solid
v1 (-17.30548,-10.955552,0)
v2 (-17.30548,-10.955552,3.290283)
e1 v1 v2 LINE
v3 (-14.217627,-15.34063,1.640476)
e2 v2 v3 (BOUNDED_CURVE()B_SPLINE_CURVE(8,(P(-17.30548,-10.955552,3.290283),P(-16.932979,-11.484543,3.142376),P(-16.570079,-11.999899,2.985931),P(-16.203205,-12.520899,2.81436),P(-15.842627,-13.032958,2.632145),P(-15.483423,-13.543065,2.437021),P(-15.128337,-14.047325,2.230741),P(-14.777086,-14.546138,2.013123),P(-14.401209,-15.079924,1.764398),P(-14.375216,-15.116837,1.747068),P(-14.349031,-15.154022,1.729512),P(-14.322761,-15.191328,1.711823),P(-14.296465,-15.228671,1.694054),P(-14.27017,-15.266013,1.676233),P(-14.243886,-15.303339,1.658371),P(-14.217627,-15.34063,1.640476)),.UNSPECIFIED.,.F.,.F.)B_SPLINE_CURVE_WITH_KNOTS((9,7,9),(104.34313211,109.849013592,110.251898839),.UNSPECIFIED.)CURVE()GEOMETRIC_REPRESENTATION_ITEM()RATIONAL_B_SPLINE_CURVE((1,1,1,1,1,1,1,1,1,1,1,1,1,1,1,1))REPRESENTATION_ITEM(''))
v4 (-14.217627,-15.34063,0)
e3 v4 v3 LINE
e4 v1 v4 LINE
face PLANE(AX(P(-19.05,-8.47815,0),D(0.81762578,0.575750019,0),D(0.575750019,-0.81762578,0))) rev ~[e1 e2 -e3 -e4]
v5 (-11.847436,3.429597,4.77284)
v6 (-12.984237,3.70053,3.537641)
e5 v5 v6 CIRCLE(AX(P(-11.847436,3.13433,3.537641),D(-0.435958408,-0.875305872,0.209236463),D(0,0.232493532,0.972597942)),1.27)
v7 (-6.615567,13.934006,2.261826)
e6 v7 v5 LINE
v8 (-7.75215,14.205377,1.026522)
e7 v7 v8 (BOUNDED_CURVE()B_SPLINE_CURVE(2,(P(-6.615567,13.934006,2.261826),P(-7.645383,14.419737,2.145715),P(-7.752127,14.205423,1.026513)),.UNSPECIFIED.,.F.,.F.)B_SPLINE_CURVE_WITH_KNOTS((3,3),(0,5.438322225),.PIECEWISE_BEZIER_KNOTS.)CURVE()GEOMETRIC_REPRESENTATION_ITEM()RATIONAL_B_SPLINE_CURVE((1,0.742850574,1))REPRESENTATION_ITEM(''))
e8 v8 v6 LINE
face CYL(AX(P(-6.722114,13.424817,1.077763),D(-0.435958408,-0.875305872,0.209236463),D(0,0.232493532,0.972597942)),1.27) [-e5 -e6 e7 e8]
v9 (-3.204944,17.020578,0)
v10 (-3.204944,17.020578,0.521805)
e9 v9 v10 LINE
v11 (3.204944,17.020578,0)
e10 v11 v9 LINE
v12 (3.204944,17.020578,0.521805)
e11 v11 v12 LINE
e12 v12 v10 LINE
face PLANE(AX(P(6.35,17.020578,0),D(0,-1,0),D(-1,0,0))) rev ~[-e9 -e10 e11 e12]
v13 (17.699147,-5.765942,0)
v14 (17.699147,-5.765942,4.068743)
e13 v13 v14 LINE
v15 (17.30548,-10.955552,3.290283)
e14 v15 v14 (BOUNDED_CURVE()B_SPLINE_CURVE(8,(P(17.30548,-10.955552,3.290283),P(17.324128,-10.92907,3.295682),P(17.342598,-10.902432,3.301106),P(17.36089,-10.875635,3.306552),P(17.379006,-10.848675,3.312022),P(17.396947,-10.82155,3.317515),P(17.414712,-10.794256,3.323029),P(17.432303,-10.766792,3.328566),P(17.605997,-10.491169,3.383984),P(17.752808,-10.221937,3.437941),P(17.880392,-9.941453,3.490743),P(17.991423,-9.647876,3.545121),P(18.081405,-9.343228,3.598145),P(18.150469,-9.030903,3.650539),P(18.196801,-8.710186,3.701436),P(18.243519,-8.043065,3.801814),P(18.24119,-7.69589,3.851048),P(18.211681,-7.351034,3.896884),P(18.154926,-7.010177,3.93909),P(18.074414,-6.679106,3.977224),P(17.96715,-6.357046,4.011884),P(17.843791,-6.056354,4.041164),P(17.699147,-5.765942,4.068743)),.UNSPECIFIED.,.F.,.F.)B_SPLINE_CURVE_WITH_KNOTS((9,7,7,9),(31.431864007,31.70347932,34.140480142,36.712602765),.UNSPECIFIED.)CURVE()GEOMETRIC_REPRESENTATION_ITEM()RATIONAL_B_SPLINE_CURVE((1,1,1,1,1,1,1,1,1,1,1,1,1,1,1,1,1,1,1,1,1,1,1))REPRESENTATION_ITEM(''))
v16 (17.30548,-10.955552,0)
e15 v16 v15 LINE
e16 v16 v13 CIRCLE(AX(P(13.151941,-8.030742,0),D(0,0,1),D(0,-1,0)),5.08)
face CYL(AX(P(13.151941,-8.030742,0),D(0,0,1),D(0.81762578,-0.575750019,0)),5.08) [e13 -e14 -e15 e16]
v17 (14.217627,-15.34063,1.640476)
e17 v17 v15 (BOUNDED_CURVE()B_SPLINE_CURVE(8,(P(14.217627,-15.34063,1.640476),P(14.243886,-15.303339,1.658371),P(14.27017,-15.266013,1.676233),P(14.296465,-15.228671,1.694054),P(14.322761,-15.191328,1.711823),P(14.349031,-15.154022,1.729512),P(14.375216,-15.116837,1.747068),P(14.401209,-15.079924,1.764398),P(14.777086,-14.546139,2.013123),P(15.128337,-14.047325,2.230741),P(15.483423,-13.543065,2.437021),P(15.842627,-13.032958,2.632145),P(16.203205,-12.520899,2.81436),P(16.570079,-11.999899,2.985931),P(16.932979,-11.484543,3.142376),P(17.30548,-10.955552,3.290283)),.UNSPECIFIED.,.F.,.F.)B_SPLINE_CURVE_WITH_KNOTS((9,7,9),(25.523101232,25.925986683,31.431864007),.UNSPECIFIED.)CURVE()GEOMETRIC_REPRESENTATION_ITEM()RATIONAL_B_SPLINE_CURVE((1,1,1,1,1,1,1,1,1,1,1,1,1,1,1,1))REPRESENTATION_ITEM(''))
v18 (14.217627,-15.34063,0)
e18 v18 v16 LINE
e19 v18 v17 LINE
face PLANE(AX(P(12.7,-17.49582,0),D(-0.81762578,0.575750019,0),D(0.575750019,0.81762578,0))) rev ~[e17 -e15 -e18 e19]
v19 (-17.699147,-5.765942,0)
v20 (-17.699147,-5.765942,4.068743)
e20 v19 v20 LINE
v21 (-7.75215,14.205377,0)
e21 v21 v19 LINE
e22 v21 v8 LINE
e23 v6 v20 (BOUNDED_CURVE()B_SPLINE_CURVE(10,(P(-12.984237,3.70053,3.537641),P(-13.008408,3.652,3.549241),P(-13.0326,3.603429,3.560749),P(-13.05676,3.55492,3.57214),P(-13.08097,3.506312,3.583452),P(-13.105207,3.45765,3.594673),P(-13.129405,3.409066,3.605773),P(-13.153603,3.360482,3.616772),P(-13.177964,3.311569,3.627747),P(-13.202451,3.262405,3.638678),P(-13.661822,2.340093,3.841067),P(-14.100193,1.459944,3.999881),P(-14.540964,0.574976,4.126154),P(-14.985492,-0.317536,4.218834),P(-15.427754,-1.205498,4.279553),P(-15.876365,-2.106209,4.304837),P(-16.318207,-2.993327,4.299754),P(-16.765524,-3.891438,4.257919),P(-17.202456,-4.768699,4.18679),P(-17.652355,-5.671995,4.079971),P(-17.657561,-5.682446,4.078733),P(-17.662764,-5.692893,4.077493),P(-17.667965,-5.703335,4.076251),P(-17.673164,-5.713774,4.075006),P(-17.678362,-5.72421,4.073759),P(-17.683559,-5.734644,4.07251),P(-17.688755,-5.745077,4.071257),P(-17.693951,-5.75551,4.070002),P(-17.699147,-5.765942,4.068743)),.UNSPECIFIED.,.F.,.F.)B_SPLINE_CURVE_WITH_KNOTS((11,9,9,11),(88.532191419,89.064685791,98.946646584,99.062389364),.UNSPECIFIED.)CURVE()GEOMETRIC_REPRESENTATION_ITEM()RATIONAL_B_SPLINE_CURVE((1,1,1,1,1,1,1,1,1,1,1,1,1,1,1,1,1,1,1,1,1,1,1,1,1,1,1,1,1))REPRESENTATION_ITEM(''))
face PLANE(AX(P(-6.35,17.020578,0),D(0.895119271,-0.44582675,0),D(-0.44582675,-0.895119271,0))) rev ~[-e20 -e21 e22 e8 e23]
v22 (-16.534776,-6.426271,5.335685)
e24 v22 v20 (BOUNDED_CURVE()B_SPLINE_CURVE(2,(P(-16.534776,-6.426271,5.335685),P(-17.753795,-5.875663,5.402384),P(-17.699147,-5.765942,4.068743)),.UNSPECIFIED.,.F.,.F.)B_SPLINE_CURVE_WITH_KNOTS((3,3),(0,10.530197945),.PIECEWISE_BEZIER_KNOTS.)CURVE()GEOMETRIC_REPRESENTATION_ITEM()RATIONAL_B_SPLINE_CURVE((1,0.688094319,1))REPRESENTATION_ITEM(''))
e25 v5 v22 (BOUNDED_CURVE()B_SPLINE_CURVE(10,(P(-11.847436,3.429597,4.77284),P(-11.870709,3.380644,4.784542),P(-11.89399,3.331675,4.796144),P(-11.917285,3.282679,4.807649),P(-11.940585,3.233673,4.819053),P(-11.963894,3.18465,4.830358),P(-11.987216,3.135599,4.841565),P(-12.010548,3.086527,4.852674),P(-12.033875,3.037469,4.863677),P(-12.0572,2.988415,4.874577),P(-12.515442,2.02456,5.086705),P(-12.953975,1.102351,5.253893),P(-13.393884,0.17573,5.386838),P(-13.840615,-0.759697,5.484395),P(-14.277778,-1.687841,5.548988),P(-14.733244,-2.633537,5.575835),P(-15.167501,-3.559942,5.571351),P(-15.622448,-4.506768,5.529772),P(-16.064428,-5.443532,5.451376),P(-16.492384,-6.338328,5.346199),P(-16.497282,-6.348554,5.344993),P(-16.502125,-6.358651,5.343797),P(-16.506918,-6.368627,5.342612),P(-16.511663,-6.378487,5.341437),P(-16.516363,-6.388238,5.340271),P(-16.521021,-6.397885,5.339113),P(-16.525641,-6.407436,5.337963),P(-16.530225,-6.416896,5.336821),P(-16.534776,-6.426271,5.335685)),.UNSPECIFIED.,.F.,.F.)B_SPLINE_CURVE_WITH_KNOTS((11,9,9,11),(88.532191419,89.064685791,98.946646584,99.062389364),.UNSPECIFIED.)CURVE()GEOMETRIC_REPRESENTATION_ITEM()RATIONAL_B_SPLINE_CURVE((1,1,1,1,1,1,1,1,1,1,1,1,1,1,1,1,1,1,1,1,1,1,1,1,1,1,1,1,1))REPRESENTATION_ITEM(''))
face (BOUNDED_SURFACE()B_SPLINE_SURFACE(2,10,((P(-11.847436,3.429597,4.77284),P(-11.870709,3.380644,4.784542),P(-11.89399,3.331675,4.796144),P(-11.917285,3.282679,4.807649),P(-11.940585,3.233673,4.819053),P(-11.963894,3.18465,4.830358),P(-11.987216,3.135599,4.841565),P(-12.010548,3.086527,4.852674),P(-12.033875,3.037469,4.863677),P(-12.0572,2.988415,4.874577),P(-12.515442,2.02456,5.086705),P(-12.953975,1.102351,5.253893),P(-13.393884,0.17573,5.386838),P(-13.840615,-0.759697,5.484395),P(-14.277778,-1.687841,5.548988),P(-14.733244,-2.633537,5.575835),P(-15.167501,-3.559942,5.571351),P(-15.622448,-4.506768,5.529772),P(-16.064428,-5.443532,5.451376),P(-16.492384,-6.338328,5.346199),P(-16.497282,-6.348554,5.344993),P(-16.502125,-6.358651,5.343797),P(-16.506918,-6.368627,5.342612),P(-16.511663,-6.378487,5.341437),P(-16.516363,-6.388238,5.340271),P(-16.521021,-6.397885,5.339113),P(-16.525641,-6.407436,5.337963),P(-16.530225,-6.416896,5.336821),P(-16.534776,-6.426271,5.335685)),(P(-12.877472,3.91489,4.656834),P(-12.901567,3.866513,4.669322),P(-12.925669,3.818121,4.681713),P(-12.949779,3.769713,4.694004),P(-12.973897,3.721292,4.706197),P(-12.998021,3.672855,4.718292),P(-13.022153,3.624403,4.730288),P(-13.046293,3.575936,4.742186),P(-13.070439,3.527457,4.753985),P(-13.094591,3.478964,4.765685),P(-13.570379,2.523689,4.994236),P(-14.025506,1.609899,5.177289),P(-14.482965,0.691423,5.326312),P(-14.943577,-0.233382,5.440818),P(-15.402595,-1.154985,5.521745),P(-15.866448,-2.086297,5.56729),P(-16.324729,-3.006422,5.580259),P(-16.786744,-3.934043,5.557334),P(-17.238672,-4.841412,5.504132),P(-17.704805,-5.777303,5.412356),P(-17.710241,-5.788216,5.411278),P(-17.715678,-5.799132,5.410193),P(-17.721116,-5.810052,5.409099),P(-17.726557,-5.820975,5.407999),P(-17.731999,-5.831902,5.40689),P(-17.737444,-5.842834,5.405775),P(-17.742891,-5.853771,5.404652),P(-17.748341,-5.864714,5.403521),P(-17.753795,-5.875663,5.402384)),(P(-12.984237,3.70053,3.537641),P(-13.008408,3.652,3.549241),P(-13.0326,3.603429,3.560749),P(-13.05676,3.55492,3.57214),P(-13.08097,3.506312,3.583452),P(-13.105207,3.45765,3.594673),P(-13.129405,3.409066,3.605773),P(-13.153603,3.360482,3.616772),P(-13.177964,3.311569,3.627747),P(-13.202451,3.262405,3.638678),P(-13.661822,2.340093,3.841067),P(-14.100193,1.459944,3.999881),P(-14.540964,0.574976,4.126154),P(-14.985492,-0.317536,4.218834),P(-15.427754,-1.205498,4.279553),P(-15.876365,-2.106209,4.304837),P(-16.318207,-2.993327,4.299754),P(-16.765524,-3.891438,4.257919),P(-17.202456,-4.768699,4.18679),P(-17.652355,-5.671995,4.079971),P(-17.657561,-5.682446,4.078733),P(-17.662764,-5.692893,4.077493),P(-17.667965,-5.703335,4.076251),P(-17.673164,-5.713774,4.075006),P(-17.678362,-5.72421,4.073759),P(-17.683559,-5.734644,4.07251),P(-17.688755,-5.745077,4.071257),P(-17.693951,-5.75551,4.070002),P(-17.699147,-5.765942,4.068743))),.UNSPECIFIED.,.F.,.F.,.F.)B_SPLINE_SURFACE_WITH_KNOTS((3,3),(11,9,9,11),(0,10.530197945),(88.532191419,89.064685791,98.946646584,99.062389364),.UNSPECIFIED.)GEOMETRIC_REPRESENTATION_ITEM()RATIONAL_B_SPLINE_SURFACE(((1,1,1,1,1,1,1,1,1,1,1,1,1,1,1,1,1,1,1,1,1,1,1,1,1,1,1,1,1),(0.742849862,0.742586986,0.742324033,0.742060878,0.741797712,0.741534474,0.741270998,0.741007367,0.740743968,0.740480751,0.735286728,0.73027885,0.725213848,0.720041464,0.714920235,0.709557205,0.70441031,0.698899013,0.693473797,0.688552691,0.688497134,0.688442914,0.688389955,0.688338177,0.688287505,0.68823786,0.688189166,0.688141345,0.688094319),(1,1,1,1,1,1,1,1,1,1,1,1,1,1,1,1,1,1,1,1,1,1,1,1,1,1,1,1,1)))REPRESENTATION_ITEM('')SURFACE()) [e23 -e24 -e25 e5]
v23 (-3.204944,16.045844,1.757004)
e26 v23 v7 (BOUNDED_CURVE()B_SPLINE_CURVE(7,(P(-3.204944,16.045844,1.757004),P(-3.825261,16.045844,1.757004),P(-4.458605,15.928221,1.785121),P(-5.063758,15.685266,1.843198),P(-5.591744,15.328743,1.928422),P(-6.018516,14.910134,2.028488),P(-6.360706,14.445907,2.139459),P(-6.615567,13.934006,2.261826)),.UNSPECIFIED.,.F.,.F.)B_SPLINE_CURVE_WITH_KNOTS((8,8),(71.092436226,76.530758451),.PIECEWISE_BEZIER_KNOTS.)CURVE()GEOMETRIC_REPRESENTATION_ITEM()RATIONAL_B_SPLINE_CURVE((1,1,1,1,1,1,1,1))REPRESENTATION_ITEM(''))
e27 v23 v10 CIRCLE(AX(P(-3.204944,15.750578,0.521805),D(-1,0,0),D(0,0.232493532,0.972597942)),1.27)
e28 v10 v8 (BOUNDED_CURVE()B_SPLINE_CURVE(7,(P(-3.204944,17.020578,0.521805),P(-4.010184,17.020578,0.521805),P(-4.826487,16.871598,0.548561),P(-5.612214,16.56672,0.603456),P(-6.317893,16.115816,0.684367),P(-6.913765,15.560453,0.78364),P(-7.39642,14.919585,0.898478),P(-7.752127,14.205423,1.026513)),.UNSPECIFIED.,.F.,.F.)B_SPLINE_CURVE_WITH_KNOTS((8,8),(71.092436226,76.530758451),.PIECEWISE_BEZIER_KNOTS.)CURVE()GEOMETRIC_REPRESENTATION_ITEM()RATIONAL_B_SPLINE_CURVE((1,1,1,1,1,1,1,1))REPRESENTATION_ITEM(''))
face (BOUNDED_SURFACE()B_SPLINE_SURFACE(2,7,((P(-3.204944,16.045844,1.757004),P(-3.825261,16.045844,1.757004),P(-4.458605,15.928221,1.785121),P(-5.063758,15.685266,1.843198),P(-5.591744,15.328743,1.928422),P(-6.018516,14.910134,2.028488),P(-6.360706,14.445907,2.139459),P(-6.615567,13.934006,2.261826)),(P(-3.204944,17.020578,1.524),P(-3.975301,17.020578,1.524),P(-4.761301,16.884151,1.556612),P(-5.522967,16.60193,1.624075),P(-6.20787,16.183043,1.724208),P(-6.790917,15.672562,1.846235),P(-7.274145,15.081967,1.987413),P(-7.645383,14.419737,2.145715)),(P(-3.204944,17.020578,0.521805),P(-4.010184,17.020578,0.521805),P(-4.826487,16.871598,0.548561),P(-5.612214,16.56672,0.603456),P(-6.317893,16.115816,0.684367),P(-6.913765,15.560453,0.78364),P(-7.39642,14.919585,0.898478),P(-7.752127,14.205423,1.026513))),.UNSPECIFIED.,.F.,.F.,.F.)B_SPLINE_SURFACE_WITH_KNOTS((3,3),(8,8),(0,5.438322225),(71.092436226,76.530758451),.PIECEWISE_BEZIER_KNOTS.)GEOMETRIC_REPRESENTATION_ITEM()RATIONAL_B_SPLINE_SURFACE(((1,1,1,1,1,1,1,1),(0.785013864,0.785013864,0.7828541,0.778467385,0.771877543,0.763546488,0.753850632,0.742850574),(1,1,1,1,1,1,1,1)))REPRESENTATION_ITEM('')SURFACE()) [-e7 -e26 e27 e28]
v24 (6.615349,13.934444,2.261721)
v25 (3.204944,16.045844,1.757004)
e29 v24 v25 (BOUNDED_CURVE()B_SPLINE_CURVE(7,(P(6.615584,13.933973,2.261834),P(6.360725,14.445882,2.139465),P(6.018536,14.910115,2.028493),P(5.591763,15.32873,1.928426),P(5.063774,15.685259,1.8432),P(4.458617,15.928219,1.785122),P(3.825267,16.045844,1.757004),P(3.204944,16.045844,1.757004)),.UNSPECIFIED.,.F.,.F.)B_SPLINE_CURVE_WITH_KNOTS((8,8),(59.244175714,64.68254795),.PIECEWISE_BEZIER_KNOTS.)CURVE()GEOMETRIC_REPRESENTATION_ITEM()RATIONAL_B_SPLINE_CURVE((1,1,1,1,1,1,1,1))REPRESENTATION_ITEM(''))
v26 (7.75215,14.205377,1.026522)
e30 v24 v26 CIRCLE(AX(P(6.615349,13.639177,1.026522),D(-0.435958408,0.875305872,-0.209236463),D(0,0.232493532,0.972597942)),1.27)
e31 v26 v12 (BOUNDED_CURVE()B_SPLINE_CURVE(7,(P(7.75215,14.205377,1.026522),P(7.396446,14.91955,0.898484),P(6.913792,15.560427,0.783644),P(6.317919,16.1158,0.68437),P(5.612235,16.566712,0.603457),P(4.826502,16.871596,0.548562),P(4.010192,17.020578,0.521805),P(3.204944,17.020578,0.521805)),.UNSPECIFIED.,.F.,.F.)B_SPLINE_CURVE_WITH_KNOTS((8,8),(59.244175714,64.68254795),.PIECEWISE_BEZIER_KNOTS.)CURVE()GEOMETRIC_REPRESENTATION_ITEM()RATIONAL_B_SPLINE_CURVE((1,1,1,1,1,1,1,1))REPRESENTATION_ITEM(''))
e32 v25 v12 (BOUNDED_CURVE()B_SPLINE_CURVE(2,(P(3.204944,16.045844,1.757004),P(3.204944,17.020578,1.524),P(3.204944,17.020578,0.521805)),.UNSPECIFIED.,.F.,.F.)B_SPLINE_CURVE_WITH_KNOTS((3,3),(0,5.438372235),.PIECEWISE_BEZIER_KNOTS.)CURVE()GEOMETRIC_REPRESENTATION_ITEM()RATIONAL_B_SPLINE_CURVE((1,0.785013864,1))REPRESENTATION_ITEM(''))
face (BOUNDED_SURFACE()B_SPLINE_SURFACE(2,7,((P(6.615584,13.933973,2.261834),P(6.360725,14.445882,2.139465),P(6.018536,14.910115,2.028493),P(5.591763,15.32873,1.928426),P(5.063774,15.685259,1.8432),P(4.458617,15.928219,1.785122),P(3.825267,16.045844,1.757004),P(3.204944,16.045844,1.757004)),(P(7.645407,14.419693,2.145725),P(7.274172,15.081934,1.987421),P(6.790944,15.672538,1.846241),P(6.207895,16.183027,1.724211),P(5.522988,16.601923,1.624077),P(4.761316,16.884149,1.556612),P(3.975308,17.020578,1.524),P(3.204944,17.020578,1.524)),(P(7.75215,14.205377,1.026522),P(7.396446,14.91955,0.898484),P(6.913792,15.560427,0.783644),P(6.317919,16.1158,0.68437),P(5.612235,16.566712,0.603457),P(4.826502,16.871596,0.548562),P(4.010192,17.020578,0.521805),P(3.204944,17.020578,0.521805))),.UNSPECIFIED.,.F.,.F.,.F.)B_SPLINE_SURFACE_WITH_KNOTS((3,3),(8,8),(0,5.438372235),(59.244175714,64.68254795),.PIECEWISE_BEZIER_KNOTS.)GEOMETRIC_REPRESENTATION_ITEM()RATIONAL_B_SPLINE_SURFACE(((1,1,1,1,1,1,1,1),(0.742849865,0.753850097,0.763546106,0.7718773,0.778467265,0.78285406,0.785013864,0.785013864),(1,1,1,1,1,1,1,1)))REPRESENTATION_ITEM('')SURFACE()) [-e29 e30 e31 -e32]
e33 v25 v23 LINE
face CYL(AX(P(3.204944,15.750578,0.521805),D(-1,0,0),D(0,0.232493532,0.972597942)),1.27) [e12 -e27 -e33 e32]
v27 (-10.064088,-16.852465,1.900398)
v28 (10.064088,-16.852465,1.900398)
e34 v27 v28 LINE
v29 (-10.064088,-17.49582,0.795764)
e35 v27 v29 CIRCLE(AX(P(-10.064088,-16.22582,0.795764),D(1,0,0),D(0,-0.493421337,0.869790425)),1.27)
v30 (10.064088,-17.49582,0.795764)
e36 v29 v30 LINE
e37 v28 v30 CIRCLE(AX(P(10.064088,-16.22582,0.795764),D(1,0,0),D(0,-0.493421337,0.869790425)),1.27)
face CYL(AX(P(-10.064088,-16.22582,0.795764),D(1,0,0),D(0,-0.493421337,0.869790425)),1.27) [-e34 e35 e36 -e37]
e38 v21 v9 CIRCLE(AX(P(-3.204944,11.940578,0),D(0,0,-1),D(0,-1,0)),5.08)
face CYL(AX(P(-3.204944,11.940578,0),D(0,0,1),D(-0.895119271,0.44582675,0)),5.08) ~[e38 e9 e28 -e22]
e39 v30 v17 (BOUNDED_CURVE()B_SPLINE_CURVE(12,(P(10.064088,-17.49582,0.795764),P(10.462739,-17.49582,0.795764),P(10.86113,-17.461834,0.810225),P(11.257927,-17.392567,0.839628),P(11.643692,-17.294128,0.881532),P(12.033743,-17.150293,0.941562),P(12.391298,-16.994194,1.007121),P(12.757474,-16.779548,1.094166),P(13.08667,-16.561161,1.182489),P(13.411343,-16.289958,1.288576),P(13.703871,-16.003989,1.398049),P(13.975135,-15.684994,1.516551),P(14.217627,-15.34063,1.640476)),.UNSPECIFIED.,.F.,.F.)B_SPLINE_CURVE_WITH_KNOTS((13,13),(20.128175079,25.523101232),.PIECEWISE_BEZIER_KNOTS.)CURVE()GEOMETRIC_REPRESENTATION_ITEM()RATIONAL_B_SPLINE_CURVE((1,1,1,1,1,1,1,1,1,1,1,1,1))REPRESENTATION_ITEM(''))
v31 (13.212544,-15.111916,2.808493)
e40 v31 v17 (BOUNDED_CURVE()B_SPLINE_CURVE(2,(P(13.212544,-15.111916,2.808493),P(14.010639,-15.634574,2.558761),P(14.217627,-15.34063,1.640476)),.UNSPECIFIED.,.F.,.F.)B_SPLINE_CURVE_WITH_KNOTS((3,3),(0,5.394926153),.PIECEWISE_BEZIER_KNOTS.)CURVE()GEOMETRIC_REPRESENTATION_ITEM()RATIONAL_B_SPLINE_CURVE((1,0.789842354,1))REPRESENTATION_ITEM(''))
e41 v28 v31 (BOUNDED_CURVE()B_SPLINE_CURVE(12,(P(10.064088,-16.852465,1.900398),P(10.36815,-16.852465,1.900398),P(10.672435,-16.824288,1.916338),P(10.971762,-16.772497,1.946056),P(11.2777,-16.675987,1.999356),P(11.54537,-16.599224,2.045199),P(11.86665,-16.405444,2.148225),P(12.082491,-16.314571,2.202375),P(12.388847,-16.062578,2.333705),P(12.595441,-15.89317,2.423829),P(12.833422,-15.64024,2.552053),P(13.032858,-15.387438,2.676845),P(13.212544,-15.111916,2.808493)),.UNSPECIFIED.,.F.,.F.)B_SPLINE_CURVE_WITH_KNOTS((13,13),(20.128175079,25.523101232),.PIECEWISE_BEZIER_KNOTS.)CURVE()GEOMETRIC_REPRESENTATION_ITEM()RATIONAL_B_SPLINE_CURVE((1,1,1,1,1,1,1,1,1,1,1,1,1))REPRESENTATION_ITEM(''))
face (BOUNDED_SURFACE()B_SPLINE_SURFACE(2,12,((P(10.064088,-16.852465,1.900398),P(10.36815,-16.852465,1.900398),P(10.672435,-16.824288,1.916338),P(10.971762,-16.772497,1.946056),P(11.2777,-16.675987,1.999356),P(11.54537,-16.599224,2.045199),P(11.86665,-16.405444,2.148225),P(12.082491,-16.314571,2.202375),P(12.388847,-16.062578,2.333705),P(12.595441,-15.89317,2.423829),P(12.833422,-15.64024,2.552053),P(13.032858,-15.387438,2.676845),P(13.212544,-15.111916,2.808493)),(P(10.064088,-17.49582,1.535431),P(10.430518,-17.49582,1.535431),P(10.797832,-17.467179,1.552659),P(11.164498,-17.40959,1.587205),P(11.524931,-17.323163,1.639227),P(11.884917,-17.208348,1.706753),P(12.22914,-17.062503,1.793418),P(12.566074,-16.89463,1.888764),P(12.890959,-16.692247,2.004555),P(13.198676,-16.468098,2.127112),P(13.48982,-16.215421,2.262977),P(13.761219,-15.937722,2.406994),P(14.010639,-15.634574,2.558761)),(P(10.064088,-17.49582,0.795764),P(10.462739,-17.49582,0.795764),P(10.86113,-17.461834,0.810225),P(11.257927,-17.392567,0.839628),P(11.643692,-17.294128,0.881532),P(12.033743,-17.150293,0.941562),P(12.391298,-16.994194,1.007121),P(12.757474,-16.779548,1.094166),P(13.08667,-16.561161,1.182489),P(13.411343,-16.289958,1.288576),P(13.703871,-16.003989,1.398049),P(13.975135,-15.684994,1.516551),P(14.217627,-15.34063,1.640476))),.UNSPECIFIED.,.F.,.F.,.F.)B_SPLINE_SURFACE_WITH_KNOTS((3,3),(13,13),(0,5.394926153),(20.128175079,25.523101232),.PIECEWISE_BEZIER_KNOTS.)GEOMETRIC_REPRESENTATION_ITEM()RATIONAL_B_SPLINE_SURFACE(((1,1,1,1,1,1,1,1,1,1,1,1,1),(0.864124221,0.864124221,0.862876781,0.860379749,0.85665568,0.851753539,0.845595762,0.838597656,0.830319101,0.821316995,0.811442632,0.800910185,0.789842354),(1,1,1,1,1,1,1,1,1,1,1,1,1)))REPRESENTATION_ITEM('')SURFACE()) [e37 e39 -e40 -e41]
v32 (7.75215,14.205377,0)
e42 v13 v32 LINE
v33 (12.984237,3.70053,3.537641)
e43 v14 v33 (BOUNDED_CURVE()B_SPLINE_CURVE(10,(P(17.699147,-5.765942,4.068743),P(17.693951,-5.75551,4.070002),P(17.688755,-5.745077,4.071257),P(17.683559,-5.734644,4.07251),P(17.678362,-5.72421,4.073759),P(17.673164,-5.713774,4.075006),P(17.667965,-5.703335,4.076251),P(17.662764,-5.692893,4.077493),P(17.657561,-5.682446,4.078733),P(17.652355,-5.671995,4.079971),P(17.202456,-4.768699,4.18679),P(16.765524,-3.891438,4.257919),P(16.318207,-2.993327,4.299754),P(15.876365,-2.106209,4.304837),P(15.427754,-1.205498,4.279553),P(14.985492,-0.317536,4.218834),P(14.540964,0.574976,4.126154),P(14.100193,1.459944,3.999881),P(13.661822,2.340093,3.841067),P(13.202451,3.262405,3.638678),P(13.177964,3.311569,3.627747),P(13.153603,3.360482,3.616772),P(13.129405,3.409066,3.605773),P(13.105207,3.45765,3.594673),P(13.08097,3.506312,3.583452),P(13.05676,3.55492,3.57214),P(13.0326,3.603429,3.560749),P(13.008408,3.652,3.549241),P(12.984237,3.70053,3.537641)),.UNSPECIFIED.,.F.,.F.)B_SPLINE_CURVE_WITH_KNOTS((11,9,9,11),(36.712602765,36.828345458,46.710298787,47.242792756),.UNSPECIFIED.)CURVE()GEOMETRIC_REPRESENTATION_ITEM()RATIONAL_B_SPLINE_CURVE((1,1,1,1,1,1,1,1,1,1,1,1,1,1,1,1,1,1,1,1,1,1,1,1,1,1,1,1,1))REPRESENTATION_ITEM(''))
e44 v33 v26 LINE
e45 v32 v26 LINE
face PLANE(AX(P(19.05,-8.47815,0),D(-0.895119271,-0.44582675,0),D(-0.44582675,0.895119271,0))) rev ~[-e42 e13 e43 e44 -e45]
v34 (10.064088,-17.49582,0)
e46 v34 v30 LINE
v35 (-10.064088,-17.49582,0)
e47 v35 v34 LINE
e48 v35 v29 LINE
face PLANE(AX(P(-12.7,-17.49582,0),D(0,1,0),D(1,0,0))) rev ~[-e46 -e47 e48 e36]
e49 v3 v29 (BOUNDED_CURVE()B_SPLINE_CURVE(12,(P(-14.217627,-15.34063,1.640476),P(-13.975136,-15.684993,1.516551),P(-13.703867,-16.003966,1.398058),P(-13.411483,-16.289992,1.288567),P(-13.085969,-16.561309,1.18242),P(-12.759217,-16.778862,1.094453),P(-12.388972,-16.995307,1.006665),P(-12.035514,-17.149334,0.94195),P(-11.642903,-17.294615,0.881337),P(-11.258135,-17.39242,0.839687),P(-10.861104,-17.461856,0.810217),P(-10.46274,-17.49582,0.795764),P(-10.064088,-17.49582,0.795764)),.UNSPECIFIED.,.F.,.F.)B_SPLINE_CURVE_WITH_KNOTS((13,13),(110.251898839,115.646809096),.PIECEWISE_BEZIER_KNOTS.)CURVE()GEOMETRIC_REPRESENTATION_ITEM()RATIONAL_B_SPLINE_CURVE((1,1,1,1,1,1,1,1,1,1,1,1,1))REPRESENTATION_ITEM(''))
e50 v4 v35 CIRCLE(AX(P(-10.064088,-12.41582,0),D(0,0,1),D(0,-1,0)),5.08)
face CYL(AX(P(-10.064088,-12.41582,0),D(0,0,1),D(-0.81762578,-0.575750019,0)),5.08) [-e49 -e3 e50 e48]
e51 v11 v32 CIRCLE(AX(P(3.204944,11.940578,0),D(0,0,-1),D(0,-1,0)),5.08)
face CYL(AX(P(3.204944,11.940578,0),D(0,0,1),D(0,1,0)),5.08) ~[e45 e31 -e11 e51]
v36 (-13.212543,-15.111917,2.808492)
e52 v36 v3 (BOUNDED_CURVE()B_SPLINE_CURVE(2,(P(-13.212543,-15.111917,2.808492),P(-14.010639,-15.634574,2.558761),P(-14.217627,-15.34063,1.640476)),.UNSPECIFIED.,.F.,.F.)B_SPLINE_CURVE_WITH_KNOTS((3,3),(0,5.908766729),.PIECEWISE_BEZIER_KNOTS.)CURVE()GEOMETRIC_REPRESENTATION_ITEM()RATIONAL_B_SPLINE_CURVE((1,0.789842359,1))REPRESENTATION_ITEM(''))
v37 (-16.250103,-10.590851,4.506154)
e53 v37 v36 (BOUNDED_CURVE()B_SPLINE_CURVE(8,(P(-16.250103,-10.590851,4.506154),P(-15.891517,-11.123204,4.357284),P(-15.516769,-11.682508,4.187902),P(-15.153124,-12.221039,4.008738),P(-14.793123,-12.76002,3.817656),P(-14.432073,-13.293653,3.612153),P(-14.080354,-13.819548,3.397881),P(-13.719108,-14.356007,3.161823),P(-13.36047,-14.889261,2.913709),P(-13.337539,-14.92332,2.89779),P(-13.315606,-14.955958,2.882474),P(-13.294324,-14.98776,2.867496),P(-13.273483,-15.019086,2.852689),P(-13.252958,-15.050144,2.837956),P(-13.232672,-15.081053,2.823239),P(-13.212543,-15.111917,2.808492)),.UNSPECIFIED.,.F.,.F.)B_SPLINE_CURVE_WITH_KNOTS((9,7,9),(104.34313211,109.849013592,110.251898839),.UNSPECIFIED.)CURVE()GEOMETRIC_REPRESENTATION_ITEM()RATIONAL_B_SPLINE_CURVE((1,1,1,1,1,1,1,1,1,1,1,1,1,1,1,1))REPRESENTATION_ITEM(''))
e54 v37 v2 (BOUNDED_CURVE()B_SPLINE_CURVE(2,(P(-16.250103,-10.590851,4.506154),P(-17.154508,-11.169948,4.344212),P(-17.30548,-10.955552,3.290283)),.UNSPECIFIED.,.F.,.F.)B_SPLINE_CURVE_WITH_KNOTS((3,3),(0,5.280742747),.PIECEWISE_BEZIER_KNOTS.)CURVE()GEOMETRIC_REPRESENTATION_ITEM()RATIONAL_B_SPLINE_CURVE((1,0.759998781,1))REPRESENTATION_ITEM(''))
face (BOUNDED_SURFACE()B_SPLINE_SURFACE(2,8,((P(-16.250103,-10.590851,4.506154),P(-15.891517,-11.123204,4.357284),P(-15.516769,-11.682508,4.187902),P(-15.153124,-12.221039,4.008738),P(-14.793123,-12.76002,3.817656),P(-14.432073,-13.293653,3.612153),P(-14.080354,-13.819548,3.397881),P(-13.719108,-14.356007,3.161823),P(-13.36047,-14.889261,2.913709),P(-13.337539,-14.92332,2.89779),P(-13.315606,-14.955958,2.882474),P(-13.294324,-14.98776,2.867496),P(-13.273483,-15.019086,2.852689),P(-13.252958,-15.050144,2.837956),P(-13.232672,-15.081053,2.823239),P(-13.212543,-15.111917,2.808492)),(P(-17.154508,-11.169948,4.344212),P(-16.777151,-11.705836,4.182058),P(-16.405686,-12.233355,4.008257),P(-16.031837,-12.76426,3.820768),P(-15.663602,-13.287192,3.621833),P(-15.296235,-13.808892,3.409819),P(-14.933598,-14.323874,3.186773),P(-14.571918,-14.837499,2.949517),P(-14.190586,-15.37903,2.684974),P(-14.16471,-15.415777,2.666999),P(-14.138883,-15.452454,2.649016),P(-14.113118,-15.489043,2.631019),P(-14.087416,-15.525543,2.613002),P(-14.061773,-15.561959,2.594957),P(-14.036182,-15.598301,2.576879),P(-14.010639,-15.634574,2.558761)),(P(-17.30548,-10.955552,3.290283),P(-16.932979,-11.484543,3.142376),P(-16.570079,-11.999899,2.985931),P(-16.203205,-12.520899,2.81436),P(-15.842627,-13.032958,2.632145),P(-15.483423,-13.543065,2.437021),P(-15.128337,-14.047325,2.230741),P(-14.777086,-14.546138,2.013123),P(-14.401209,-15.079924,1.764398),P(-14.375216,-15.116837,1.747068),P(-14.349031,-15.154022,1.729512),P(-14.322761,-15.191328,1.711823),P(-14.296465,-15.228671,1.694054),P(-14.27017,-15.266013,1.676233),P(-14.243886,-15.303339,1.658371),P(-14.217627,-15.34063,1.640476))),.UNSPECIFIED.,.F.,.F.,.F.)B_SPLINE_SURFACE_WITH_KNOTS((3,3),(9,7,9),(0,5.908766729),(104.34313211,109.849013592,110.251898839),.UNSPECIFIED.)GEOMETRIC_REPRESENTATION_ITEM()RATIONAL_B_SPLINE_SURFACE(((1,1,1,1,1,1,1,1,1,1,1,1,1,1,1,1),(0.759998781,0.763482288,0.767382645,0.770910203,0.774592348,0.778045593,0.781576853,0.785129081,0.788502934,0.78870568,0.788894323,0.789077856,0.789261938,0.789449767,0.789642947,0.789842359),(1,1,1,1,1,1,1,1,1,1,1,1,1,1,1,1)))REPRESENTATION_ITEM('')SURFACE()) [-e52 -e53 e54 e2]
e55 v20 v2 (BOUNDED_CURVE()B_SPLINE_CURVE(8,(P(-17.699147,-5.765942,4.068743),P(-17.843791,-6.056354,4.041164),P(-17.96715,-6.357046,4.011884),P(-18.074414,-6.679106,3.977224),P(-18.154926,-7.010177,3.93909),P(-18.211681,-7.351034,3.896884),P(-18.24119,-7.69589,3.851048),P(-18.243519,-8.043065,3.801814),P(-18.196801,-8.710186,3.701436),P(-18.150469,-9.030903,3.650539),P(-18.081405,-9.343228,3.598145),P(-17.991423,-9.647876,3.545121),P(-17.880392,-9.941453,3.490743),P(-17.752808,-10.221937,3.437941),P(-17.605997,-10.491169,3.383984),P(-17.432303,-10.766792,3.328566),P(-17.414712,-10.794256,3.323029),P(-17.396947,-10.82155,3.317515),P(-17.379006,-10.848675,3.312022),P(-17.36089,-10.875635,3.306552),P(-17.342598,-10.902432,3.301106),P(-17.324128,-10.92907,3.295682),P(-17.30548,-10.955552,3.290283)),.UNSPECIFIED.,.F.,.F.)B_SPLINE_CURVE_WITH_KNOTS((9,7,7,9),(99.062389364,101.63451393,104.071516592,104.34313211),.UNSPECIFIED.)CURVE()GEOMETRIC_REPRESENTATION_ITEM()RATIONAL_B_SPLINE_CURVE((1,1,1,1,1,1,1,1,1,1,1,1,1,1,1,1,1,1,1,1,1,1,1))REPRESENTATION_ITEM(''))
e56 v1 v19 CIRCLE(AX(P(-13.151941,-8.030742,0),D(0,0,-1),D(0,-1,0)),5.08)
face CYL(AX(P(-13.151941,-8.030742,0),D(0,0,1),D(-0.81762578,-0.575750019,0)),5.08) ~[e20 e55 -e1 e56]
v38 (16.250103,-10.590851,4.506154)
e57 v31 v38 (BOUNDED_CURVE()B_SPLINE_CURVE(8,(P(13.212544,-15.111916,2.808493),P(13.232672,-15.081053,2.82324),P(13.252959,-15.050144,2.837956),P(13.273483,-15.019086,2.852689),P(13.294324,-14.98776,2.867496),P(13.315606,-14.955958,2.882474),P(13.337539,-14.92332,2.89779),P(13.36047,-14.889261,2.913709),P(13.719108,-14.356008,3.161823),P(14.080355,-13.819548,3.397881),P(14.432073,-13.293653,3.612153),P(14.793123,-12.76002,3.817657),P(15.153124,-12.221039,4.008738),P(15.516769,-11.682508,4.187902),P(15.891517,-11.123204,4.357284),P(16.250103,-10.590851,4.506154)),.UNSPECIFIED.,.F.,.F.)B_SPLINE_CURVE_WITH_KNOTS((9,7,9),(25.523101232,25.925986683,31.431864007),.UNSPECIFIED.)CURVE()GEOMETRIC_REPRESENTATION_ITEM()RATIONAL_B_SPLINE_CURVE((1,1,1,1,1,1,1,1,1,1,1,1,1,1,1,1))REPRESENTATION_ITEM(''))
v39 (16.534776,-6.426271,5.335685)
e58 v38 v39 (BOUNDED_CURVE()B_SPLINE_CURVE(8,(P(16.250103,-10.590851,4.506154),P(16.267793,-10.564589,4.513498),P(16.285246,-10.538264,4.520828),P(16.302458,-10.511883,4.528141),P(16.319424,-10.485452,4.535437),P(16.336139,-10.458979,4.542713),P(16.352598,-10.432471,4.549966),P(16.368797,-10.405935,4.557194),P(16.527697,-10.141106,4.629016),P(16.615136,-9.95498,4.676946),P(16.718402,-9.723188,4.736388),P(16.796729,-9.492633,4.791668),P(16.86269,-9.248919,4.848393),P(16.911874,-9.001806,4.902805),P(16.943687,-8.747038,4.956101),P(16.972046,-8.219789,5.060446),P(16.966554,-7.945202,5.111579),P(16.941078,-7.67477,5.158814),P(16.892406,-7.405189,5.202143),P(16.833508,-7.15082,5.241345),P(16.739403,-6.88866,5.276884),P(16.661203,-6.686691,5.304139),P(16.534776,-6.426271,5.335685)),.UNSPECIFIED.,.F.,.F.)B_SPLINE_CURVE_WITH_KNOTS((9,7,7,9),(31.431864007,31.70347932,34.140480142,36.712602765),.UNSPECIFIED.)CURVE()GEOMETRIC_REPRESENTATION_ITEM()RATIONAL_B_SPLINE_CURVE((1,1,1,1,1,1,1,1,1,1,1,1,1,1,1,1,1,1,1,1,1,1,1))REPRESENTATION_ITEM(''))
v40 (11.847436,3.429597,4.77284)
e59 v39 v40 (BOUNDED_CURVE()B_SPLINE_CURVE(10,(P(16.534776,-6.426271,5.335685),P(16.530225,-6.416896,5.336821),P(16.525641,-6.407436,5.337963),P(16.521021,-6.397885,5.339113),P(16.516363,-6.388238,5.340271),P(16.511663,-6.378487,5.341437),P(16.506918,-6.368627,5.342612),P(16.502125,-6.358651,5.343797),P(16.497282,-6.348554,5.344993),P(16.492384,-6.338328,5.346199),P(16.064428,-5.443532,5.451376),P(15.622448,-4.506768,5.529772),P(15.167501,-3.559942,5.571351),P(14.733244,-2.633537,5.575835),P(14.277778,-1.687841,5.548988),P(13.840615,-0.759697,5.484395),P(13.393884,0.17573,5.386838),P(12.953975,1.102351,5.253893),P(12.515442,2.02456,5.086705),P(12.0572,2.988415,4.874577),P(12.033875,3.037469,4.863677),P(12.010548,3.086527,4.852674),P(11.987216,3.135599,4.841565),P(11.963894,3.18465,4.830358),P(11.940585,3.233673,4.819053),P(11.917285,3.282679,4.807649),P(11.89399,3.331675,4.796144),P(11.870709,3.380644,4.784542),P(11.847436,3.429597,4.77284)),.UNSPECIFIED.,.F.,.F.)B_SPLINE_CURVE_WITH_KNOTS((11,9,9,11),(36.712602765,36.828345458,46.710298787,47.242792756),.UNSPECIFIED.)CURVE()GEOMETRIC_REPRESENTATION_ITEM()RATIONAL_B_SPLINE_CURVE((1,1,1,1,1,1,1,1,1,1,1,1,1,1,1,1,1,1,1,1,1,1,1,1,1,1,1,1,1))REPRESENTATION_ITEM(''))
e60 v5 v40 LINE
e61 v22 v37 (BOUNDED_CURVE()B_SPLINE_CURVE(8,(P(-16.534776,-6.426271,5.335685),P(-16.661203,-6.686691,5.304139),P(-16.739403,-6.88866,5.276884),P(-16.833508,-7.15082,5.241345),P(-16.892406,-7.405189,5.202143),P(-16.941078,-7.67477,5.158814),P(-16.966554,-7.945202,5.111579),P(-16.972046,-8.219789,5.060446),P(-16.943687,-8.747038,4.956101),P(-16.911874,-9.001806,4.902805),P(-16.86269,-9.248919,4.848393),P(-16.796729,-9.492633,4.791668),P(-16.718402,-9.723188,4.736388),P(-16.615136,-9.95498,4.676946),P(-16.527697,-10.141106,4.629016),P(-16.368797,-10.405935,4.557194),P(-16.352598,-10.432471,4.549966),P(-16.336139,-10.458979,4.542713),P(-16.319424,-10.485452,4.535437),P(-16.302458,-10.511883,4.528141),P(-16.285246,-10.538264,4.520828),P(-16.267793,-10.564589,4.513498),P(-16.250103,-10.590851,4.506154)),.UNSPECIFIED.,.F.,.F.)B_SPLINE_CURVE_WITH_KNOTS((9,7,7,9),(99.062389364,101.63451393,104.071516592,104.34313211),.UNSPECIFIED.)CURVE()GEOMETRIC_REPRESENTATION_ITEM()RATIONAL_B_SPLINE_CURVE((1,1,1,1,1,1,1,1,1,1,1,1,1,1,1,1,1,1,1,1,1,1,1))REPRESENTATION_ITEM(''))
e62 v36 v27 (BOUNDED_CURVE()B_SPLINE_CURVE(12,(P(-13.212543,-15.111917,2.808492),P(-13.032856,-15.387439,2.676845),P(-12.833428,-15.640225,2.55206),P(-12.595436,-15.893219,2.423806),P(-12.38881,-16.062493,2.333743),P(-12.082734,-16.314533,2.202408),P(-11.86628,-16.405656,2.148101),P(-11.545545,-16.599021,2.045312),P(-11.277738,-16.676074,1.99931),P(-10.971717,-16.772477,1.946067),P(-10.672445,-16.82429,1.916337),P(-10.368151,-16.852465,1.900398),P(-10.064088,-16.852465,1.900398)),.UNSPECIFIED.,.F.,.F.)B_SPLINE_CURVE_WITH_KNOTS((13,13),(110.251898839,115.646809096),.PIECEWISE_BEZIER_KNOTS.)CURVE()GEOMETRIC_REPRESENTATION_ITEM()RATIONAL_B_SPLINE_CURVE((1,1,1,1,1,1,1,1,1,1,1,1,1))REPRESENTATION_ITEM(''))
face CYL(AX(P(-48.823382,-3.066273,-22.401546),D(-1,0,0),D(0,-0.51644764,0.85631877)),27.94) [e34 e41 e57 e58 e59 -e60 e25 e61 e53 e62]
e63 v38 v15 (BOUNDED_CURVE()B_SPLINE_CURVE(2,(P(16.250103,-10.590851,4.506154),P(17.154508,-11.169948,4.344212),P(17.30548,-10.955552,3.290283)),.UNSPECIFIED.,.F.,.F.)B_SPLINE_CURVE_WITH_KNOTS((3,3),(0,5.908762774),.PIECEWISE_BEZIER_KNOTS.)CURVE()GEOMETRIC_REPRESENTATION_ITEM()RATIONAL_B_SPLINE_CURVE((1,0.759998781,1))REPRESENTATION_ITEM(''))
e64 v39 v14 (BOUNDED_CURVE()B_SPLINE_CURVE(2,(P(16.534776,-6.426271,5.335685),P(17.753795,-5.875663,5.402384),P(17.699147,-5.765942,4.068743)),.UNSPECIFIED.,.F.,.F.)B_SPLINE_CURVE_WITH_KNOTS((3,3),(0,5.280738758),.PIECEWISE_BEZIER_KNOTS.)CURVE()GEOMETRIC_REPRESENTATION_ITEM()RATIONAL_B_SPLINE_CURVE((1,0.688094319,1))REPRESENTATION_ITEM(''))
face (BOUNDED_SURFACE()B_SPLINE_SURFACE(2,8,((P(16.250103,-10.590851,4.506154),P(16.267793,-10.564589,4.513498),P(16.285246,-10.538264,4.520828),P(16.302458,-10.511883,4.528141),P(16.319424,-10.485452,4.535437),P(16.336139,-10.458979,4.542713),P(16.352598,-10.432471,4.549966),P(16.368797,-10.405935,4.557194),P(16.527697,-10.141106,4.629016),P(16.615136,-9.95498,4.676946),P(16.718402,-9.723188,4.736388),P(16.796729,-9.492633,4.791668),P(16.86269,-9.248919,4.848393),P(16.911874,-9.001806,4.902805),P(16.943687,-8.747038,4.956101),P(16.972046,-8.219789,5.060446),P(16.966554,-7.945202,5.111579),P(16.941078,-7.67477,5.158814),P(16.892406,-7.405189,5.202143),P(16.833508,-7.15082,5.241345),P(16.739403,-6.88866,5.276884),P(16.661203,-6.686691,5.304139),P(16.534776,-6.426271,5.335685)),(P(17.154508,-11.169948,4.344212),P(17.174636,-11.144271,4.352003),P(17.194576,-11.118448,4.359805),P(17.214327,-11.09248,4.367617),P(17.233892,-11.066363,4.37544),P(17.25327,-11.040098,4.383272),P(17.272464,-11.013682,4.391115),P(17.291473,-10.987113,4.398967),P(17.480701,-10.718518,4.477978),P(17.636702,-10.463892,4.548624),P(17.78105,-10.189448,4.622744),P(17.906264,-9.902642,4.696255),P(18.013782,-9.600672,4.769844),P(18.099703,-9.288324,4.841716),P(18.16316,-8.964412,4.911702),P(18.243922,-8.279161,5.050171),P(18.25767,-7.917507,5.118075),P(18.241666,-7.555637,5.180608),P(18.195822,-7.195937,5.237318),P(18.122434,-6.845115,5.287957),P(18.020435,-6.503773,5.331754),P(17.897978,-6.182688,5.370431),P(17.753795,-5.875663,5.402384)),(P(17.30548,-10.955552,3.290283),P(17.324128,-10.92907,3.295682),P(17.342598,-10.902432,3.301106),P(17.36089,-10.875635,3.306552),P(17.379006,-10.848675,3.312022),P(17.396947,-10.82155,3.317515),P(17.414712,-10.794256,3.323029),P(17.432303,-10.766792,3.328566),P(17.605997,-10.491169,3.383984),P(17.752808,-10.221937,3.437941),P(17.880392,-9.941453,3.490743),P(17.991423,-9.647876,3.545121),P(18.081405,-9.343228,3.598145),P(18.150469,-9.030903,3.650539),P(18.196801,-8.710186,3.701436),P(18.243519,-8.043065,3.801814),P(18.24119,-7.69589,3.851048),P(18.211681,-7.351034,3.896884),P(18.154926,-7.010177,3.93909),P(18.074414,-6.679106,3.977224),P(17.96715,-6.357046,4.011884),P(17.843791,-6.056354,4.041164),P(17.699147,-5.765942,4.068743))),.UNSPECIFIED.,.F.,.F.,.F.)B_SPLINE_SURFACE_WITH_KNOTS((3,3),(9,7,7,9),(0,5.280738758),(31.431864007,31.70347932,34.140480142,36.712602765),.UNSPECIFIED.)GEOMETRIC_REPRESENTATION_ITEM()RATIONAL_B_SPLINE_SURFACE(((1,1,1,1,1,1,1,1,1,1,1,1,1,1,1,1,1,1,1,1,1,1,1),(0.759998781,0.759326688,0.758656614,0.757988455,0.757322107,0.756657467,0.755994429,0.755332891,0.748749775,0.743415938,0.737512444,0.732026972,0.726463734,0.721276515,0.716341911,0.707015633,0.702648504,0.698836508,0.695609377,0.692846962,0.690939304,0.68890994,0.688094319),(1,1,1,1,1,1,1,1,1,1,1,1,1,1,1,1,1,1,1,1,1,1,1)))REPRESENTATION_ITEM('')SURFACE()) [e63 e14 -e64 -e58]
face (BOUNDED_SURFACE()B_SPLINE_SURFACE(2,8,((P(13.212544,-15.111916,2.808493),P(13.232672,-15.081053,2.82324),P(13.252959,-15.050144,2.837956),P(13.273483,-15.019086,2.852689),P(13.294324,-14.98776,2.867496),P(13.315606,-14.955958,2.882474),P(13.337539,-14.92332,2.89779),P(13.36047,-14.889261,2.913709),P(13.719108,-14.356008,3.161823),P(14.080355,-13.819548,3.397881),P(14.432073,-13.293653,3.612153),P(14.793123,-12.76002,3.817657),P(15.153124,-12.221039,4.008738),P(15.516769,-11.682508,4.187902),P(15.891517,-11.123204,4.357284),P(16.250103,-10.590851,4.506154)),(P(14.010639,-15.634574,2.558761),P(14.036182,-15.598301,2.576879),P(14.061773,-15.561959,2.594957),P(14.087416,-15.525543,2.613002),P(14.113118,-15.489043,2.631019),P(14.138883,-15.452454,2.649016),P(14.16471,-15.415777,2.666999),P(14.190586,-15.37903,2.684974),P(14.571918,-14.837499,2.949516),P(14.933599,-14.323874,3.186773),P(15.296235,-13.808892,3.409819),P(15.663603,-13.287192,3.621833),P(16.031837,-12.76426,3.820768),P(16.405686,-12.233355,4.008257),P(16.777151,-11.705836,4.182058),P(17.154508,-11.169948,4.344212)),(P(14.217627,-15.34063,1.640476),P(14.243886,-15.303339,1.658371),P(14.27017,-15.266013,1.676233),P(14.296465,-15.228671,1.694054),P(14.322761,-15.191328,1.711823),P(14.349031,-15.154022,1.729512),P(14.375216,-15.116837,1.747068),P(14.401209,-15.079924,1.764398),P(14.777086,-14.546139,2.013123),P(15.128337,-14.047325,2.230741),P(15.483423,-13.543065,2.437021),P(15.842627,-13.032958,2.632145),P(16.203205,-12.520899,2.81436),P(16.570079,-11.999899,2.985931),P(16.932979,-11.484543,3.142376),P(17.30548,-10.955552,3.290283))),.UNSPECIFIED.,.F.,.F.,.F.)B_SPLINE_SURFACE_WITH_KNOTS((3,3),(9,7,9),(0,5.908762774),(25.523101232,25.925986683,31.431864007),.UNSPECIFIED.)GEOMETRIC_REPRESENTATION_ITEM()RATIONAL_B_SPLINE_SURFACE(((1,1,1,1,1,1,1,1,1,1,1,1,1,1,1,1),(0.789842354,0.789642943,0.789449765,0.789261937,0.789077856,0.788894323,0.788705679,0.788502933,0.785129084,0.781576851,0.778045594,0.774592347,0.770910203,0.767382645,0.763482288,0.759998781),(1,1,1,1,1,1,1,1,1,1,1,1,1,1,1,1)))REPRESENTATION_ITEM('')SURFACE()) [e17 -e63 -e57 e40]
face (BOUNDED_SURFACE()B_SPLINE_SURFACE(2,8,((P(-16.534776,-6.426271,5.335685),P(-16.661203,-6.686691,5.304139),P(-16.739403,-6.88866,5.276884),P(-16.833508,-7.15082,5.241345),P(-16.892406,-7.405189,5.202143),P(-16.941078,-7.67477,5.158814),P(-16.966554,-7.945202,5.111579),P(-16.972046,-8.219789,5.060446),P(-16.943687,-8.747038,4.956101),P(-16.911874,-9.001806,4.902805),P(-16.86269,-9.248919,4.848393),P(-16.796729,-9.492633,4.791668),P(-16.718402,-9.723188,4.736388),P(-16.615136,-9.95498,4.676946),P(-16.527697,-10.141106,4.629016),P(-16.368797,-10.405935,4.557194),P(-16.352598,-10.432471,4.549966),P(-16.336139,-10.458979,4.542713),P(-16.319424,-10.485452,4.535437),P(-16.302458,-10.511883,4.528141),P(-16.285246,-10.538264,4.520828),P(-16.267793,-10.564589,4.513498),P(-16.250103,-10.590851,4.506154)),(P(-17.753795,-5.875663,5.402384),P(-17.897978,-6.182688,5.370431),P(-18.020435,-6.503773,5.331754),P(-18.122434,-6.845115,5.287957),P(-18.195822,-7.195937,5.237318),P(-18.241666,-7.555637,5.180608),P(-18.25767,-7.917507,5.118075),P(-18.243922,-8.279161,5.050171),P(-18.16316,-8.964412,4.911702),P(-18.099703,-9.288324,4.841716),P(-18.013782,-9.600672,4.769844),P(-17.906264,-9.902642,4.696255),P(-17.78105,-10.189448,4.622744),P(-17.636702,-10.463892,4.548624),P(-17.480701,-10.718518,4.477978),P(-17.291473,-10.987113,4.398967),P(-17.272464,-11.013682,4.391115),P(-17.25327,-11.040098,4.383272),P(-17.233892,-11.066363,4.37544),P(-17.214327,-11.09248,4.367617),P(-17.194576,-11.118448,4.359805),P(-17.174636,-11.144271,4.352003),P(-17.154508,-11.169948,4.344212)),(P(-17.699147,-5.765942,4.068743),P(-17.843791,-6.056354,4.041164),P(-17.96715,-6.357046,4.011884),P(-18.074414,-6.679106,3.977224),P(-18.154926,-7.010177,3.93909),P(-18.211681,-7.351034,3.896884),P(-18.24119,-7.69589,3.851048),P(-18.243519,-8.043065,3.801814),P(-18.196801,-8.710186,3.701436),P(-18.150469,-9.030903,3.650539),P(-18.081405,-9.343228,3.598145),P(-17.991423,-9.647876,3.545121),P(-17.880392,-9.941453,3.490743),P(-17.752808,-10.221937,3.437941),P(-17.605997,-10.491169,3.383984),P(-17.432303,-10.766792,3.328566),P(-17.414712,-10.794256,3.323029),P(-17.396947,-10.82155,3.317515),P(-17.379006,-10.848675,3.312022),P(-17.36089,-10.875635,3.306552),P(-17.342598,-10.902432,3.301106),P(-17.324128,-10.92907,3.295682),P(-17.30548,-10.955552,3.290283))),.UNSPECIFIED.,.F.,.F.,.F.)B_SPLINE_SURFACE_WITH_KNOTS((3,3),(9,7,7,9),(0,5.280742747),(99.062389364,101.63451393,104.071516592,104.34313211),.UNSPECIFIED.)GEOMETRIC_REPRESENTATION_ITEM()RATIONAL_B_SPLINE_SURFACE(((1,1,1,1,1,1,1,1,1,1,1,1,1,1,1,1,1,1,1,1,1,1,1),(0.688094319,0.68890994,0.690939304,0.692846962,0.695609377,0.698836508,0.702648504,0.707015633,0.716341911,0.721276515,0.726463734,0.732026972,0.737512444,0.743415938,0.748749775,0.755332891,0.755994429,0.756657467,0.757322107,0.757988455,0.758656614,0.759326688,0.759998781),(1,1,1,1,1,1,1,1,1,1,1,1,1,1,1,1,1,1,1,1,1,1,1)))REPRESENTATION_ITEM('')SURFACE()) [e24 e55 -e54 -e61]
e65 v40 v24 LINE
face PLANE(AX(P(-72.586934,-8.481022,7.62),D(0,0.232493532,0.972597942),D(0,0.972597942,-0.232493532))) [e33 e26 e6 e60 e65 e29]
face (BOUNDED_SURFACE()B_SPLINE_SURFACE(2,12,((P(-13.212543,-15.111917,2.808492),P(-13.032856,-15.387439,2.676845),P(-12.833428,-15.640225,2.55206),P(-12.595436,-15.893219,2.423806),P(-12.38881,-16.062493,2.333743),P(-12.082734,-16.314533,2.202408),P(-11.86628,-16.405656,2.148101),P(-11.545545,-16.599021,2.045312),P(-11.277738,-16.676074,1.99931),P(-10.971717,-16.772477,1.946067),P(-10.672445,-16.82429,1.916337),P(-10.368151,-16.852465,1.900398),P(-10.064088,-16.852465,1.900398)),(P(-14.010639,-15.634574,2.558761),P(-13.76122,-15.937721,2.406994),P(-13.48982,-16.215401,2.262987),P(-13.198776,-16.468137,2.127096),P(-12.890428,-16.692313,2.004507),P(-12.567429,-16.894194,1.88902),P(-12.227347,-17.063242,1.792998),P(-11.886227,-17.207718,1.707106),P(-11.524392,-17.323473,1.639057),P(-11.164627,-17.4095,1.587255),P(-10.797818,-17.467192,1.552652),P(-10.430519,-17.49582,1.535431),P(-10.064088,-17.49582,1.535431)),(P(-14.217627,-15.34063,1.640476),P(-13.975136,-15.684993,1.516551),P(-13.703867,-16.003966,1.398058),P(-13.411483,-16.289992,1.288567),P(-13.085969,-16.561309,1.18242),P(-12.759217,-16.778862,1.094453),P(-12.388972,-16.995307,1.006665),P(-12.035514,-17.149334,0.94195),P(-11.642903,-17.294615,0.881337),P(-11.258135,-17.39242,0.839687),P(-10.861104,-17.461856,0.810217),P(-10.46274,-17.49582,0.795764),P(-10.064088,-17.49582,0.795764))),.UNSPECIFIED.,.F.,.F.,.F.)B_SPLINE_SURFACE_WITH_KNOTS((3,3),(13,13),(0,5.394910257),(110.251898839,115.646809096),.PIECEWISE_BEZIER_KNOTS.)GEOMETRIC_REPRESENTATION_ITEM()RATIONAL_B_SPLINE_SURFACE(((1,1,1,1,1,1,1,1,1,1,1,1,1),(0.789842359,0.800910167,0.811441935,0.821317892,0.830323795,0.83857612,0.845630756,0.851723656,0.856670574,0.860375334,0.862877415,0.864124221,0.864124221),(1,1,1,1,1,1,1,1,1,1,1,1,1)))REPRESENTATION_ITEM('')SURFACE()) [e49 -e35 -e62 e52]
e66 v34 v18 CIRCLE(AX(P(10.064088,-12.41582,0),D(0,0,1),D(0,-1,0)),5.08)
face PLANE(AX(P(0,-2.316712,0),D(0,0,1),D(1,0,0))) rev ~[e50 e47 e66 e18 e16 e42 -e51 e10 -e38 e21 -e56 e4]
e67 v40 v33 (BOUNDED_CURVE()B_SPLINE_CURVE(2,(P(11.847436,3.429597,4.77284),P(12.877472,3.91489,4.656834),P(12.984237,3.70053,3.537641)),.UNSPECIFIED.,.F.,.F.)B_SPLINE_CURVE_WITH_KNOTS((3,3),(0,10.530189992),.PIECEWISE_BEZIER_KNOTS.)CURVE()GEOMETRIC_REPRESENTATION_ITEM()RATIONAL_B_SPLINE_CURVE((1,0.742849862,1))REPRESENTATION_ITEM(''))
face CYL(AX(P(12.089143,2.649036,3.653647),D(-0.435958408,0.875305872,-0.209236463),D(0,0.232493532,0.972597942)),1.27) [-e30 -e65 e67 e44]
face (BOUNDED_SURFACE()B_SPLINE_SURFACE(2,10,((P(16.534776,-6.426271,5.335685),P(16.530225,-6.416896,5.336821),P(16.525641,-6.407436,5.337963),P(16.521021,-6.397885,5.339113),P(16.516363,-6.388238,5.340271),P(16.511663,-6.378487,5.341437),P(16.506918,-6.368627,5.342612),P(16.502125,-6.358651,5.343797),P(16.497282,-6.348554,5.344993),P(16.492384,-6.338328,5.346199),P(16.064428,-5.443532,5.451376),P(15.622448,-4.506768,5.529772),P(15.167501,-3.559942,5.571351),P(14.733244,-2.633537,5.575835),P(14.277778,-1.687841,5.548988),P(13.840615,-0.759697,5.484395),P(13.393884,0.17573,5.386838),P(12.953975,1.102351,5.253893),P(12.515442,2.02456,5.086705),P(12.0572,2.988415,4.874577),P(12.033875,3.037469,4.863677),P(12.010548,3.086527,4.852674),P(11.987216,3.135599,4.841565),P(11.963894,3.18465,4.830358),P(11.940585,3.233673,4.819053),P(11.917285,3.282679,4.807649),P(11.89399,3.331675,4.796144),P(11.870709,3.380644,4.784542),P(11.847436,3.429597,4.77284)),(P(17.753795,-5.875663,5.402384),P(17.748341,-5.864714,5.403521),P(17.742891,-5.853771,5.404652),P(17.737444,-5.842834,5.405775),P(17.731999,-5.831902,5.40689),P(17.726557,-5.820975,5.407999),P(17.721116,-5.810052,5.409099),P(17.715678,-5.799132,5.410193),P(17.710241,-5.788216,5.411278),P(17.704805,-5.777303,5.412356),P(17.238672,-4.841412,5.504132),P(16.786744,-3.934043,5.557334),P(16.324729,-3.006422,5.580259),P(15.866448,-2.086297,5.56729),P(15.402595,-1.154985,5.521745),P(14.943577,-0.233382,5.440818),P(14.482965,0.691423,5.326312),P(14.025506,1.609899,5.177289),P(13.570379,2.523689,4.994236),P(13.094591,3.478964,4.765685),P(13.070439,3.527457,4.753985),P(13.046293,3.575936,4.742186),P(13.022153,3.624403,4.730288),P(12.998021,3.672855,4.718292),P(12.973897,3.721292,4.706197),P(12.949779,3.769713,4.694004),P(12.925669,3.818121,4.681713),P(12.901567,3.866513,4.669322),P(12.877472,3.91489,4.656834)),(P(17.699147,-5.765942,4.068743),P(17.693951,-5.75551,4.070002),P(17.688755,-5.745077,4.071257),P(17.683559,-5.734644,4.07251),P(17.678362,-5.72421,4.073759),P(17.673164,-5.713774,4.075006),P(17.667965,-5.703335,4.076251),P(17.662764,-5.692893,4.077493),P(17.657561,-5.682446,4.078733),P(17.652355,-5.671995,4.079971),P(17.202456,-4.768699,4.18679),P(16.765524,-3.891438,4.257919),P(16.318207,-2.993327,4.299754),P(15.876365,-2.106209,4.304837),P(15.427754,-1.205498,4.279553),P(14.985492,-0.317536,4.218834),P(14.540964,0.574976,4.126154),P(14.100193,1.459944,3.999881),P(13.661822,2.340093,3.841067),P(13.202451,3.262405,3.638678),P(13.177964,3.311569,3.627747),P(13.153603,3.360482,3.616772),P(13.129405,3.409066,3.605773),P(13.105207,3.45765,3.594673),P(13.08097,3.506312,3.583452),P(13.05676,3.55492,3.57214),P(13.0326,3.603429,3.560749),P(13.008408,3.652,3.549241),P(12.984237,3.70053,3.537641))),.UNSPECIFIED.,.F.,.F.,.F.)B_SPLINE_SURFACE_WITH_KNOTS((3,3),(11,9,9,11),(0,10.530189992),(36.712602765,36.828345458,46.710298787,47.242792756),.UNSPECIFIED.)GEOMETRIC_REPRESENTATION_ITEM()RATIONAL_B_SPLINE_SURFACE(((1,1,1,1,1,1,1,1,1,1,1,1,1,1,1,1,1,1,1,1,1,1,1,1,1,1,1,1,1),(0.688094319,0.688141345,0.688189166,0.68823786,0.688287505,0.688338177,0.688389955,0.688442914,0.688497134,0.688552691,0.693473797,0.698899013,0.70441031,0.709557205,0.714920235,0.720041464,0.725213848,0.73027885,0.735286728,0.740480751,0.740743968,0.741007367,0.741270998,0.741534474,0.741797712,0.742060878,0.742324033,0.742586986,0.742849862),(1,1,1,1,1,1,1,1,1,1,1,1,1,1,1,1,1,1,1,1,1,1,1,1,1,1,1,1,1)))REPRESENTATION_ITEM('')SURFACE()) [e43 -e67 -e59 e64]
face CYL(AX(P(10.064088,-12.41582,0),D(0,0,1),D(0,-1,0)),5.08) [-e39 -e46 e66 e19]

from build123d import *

# Parameters (mm, degrees)
F1_DEPTH    = 7.62
F2_SIZE2    = 6.096
F2_SIZE     = 9.017
F3_T1_DEPTH = 145.1738679331
F4_R        = 5.08
F5_T1_DEPTH = 97.646763874
F6_R        = 1.27


# Not quite as in the source:
# - a fillet or chamfer that OpenCascade refuses, or shapes differently, is made with other operations: its cross-section is extruded or revolved along the edge and cut away or added


with BuildPart() as f1:
    # F0 (on Top) → F1 (new body)
    with BuildSketch(Plane.XY):
        Polygon((-19.05, -8.4781497717), (-12.7, -17.4958198279), (12.7, -17.4958198279), (19.05, -8.4781497717), (6.35, 17.0205775648), (-6.35, 17.0205775648), align=None)
    extrude(amount=F1_DEPTH)

    # F2
    f2_edges = [f1.edges().sort_by_distance(p)[0] for p in [
        (0, -17.49582, 7.62),
    ]]
    f2_side = f1.faces().sort_by_distance((0, -2.400647, 7.62))[0]
    chamfer(f2_edges, length=F2_SIZE, length2=F2_SIZE2, reference=f2_side)

    # F3: chamfer of 25.5016 x 6.096 on 1 edges, made by hand

    # F3_s2 → F3_t1 (cut)
    with BuildSketch(Plane.YZ.offset(-72.5869339665)):
        Polygon((-8.4810224352, 7.62), (17.0205775648, 1.524), (17.0205775648, 7.62), align=None)
    extrude(amount=F3_T1_DEPTH, mode=Mode.SUBTRACT)

    # F4
    f4_edges = [f1.edges().sort_by_distance(p)[0] for p in [
        (19.05, -8.47815, 3.809657),
        (12.7, -17.49582, 0.762),
        (-12.7, -17.49582, 0.762),
        (-19.05, -8.47815, 3.809657),
        (6.35, 17.020578, 0.762),
        (-6.35, 17.020578, 0.762),
    ]]
    fillet(f4_edges, radius=F4_R)

    # F5: fillet of radius 27.94 on 1 edges, made by hand

    # F5_s2 → F5_t1 (cut)
    with BuildSketch(Plane.YZ.offset(-48.823381937)):
        with BuildLine():
            ThreePointArc((-17.4958198279, 1.524), (-7.3528274709, 5.2076739368), (3.4295965216, 4.77284009))
            Line((3.4295965216, 4.77284009), (-8.4793951963, 7.6196110186))
            Line((-8.4793951963, 7.6196110186), (-17.4958198279, 1.524))
        make_face()
    extrude(amount=F5_T1_DEPTH, mode=Mode.SUBTRACT)

    # F6
    f6_edges = [f1.edges().sort_by_distance(p)[0] for p in [
        (0, -17.49582, 1.524),
        (-15.736261, -13.184009, 3.642167),
        (-18.210711, -8.494691, 5.006042),
        (-12.356582, -16.949127, 1.845308),
        (-15.396033, -1.141811, 5.472098),
        (15.396033, -1.141811, 5.472098),
        (18.210711, -8.494691, 5.006042),
        (15.736261, -13.184009, 3.642167),
        (12.356317, -16.949258, 1.845234),
        (-10.435665, 8.817487, 3.484898),
        (-5.879006, 16.259813, 1.705856),
        (0, 17.020578, 1.524),
        (5.879006, 16.259813, 1.705856),
        (10.435665, 8.817487, 3.484898),
    ]]
    fillet(f6_edges, radius=F6_R)


solid = f1.part
